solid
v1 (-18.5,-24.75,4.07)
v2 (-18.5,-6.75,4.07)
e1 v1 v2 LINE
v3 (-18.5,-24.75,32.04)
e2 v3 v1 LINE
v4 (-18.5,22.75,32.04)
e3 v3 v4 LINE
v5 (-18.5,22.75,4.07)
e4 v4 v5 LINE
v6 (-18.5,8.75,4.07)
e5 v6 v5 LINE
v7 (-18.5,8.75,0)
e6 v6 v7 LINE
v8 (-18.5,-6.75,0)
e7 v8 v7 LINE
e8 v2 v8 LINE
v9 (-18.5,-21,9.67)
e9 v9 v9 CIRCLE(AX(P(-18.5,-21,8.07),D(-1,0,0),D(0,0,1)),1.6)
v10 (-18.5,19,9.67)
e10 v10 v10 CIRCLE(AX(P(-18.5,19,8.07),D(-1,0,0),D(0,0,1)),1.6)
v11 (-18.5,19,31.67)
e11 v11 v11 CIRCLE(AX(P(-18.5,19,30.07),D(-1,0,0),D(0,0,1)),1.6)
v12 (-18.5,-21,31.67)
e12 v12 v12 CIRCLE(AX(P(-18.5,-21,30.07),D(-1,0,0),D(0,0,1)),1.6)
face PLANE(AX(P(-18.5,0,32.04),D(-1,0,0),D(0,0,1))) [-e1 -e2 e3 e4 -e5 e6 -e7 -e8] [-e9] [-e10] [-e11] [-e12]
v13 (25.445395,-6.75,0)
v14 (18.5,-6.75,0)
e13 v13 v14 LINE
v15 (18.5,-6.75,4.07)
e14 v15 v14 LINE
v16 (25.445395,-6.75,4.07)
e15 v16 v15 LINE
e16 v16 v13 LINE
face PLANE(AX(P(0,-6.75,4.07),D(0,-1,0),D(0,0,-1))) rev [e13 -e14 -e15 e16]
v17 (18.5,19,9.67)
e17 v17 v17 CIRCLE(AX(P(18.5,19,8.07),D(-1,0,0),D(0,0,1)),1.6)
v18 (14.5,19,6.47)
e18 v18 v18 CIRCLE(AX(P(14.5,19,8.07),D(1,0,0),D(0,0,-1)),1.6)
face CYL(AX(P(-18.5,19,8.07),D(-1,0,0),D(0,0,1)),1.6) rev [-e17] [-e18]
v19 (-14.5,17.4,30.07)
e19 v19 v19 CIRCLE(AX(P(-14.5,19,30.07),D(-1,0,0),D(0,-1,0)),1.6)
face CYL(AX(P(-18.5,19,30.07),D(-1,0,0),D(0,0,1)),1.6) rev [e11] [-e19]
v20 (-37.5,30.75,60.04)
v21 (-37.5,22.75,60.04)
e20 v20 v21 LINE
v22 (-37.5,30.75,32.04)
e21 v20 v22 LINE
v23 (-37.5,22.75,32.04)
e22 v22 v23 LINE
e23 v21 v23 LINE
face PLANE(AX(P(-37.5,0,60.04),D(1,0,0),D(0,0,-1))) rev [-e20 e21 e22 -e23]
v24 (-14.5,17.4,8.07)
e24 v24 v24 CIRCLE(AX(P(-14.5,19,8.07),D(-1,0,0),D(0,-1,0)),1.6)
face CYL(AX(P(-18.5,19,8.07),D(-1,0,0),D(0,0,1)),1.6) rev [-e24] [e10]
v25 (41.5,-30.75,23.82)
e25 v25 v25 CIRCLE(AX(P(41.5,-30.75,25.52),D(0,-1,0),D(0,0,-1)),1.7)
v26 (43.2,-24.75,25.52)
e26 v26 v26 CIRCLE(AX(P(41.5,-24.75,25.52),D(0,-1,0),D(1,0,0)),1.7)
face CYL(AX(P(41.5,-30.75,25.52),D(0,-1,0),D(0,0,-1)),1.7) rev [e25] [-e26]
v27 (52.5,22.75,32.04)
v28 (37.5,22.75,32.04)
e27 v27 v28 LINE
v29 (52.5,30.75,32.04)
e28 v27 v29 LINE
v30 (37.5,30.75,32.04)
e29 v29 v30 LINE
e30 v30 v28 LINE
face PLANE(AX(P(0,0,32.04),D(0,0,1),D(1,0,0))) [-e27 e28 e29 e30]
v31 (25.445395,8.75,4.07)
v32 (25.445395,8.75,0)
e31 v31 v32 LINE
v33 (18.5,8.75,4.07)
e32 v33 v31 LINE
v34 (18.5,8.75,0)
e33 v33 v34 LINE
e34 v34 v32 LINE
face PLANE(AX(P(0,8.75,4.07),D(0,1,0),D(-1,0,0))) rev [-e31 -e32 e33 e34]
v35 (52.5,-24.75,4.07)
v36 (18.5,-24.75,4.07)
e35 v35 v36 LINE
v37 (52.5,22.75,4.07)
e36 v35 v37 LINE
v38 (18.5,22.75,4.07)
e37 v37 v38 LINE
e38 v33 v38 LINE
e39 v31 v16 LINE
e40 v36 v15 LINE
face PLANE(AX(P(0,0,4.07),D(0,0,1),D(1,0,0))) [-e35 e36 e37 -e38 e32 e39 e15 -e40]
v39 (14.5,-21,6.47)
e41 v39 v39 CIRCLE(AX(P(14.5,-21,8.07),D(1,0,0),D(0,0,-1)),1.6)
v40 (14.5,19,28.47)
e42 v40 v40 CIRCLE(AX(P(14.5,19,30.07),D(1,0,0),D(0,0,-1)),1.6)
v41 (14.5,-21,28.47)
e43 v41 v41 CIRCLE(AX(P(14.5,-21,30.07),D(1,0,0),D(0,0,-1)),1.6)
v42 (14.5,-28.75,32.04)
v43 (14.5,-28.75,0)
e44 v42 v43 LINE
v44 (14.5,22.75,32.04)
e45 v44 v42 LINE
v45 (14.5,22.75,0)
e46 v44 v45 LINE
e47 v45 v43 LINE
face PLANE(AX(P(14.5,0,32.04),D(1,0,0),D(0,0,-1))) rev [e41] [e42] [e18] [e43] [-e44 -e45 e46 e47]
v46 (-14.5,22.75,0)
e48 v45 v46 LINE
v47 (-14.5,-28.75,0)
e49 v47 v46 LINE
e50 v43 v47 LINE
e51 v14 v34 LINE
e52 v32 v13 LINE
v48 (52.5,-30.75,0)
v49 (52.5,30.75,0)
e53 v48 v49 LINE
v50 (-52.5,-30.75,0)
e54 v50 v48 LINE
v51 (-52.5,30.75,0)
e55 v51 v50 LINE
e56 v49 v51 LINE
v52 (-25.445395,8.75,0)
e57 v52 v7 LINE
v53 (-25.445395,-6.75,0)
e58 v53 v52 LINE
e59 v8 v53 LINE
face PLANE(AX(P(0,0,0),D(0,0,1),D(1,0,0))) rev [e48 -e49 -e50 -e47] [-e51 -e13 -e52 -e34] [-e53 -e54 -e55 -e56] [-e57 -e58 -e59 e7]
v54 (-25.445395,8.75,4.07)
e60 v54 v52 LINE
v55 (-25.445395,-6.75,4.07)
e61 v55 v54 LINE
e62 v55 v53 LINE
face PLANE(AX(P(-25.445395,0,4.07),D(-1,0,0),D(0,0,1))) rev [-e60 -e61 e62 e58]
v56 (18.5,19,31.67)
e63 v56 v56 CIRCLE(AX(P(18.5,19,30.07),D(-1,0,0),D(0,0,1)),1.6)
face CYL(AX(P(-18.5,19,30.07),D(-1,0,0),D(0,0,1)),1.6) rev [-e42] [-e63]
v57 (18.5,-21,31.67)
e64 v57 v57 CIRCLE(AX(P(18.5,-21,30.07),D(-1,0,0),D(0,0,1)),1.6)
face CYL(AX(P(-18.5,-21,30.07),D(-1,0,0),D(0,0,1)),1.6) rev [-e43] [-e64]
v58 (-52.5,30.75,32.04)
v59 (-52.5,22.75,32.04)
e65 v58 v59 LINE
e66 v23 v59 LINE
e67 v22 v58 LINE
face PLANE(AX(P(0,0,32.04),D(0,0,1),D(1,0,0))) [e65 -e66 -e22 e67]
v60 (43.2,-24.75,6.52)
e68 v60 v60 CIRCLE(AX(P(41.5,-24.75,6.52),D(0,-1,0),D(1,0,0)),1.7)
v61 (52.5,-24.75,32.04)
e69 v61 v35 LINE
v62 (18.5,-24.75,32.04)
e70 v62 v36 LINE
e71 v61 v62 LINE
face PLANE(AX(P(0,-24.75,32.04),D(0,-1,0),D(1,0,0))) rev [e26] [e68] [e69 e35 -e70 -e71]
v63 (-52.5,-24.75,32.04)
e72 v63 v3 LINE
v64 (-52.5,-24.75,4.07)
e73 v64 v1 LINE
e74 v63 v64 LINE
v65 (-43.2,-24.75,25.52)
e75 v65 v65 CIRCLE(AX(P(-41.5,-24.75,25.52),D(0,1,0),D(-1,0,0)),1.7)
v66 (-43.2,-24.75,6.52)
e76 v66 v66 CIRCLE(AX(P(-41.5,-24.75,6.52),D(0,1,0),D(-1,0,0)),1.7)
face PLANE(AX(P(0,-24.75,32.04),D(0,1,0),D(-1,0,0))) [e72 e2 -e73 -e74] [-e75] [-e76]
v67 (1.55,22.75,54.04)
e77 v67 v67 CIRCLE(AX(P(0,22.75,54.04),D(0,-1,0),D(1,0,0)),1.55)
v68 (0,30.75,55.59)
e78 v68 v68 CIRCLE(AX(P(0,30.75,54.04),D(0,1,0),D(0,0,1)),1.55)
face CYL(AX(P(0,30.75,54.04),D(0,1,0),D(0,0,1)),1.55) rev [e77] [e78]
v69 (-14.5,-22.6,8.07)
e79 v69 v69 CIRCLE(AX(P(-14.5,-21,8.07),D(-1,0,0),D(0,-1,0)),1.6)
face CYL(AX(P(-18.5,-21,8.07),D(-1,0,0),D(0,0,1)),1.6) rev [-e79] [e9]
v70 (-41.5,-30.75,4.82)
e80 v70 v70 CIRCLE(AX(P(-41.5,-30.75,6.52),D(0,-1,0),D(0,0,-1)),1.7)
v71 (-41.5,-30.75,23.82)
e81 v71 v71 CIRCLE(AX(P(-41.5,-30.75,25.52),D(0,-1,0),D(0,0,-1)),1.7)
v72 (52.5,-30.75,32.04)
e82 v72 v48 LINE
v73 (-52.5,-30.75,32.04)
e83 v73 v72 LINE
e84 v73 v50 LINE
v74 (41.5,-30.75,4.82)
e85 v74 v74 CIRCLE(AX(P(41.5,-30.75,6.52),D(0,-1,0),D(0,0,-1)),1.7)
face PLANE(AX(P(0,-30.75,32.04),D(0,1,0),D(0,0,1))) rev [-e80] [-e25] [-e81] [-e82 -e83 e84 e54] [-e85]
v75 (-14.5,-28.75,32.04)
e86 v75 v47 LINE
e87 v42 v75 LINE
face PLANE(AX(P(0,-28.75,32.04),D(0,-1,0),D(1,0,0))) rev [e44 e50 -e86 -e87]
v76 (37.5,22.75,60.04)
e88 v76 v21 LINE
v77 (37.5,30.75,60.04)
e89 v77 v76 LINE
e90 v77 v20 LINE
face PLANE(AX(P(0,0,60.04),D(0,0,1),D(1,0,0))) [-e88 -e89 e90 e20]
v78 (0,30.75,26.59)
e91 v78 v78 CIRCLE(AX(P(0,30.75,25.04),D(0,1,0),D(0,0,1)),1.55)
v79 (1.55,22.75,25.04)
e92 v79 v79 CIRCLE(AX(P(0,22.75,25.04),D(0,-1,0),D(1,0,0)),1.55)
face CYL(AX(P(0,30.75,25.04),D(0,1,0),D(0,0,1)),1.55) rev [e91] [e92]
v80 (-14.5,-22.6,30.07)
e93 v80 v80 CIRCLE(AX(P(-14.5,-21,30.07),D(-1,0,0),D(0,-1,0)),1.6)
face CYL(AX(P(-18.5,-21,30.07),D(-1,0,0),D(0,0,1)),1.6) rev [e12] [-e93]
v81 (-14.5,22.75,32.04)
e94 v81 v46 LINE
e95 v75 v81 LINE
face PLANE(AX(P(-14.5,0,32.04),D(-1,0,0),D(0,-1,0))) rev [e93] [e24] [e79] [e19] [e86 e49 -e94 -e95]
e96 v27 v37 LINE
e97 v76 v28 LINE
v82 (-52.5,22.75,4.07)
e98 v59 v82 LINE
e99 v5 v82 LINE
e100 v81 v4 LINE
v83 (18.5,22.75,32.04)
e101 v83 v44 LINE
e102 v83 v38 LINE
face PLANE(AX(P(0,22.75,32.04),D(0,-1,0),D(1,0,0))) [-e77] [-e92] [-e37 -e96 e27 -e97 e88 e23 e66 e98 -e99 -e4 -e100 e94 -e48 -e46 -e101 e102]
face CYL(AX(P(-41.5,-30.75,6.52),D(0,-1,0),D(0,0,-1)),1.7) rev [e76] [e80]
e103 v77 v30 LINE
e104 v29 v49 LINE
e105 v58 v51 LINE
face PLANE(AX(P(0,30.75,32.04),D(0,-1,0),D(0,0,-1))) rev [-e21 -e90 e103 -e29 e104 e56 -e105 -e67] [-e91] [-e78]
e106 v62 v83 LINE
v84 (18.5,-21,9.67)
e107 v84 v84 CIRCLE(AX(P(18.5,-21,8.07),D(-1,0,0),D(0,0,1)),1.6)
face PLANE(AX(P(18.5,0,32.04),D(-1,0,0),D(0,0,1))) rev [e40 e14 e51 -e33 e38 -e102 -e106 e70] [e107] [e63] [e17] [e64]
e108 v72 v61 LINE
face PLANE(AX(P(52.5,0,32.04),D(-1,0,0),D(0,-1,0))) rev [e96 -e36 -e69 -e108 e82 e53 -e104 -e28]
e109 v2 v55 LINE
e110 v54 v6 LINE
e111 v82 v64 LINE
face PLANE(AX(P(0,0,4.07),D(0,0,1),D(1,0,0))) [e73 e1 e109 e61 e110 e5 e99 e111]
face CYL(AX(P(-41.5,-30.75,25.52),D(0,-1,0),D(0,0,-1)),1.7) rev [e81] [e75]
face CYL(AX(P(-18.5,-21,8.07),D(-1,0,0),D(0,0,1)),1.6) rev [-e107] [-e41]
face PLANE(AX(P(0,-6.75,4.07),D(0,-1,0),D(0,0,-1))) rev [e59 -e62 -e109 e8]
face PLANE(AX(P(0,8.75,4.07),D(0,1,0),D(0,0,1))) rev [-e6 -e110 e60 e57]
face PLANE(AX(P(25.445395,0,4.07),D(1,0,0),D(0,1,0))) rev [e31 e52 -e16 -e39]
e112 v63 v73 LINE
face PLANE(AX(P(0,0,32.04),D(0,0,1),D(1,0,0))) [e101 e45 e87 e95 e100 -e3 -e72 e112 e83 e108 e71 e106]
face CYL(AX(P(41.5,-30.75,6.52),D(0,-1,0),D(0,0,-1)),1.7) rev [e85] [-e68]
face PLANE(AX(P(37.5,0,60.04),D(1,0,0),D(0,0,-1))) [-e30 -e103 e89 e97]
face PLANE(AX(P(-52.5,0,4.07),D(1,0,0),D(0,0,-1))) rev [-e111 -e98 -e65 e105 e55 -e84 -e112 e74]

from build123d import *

# Parameters (mm, degrees)
BOSS_EXTRU_1_DEPTH         = 4.07
BOSS_EXTRU_1_2_DEPTH       = 4.07
ESQUISSE1_3_W              = 15
ESQUISSE1_3_H              = 8
BOSS_EXTRU_2_DEPTH         = 32.04
BOSS_EXTRU_3_DEPTH         = 60.04
D_GAGEMENT_M31_D           = 3.2
D_GAGEMENT_M32_D           = 3.4
D_GAGEMENT_M32_DEPTH       = 6
D_GAGEMENT_START           = 22.75
D_GAGEMENT_M2_51_OUTLINE_R = 1.55
D_GAGEMENT_M2_51_DEPTH     = 8


# Read off the part's stored shape, not the designer's step: Dégagement M2.51
with BuildPart() as part:
    # Esquisse1 → Boss.-Extru.1 (new body)
    with BuildSketch(Plane.XY):
        Polygon((-52.5, -24.75), (-18.5, -24.75), (-18.5, -6.75), (-25.445395167, -6.75), (-25.445395167, 8.75), (-18.5, 8.75), (-18.5, 22.75), (-52.5, 22.75), align=None)
    extrude(amount=BOSS_EXTRU_1_DEPTH)



with BuildPart() as body_2:
    # Esquisse1 → Boss.-Extru.1 2 (new body)
    with BuildSketch(Plane.XY):
        Polygon((18.5, -24.75), (52.5, -24.75), (52.5, 22.75), (37.5, 22.75), (18.5, 22.75), (18.5, 8.75), (25.445395167, 8.75), (25.445395167, -6.75), (18.5, -6.75), align=None)
    extrude(amount=BOSS_EXTRU_1_2_DEPTH)


with BuildPart() as part_1:
    add(part.part)

    add(body_2.part)  # Boss.-Extru.2 merges body 2
    # Esquisse1<3> → Boss.-Extru.2 (add)
    with BuildSketch(Plane.XY):
        with Locations((-45, 26.75)):
            Rectangle(ESQUISSE1_3_W, ESQUISSE1_3_H)
        Polygon((-18.5, 8.75), (-18.5, -6.75), (-18.5, -24.75), (-52.5, -24.75), (-52.5, -30.75), (52.5, -30.75), (52.5, -24.75), (18.5, -24.75), (18.5, -6.75), (18.5, 8.75), (18.5, 22.75), (14.5, 22.75), (14.5, -28.75), (-14.5, -28.75), (-14.5, 22.75), (-18.5, 22.75), align=None)
        with Locations((45, 26.75)):
            Rectangle(ESQUISSE1_3_W, ESQUISSE1_3_H)
    extrude(amount=BOSS_EXTRU_2_DEPTH)

    # Esquisse1<4> → Boss.-Extru.3 (add)
    with BuildSketch(Plane.XY):
        Polygon((-37.5, 22.75), (-18.5, 22.75), (-14.5, 22.75), (14.5, 22.75), (18.5, 22.75), (37.5, 22.75), (37.5, 30.75), (-37.5, 30.75), align=None)
    extrude(amount=BOSS_EXTRU_3_DEPTH)

    # Dégagement M31 (through all)
    with Locations(Plane.ZY.offset(18.5)):
        with Locations((8.07, -21), (8.07, 19), (30.07, 19), (30.07, -21)):
            Hole(D_GAGEMENT_M31_D / 2)

    # Dégagement M32
    with Locations(Plane(origin=(0, -30.75, 0), x_dir=(-1, 0, 0), z_dir=(0, -1, 0))):
        with Locations((-41.5, -25.52), (-41.5, -6.52), (41.5, -6.52), (41.5, -25.52)):
            Hole(D_GAGEMENT_M32_D / 2, depth=D_GAGEMENT_M32_DEPTH)

    # Dégagement M2.51 outline → Dégagement M2.51 (cut)
    with BuildSketch(Plane(origin=(0, 0, 0), x_dir=(1, 0, 0), z_dir=(0, 1, 0)).offset(D_GAGEMENT_START)):
        with Locations((0, -54.04)):
            Circle(D_GAGEMENT_M2_51_OUTLINE_R)
        with Locations((0, -25.04)):
            Circle(D_GAGEMENT_M2_51_OUTLINE_R)
    extrude(amount=D_GAGEMENT_M2_51_DEPTH, mode=Mode.SUBTRACT)


solid = part_1.part
